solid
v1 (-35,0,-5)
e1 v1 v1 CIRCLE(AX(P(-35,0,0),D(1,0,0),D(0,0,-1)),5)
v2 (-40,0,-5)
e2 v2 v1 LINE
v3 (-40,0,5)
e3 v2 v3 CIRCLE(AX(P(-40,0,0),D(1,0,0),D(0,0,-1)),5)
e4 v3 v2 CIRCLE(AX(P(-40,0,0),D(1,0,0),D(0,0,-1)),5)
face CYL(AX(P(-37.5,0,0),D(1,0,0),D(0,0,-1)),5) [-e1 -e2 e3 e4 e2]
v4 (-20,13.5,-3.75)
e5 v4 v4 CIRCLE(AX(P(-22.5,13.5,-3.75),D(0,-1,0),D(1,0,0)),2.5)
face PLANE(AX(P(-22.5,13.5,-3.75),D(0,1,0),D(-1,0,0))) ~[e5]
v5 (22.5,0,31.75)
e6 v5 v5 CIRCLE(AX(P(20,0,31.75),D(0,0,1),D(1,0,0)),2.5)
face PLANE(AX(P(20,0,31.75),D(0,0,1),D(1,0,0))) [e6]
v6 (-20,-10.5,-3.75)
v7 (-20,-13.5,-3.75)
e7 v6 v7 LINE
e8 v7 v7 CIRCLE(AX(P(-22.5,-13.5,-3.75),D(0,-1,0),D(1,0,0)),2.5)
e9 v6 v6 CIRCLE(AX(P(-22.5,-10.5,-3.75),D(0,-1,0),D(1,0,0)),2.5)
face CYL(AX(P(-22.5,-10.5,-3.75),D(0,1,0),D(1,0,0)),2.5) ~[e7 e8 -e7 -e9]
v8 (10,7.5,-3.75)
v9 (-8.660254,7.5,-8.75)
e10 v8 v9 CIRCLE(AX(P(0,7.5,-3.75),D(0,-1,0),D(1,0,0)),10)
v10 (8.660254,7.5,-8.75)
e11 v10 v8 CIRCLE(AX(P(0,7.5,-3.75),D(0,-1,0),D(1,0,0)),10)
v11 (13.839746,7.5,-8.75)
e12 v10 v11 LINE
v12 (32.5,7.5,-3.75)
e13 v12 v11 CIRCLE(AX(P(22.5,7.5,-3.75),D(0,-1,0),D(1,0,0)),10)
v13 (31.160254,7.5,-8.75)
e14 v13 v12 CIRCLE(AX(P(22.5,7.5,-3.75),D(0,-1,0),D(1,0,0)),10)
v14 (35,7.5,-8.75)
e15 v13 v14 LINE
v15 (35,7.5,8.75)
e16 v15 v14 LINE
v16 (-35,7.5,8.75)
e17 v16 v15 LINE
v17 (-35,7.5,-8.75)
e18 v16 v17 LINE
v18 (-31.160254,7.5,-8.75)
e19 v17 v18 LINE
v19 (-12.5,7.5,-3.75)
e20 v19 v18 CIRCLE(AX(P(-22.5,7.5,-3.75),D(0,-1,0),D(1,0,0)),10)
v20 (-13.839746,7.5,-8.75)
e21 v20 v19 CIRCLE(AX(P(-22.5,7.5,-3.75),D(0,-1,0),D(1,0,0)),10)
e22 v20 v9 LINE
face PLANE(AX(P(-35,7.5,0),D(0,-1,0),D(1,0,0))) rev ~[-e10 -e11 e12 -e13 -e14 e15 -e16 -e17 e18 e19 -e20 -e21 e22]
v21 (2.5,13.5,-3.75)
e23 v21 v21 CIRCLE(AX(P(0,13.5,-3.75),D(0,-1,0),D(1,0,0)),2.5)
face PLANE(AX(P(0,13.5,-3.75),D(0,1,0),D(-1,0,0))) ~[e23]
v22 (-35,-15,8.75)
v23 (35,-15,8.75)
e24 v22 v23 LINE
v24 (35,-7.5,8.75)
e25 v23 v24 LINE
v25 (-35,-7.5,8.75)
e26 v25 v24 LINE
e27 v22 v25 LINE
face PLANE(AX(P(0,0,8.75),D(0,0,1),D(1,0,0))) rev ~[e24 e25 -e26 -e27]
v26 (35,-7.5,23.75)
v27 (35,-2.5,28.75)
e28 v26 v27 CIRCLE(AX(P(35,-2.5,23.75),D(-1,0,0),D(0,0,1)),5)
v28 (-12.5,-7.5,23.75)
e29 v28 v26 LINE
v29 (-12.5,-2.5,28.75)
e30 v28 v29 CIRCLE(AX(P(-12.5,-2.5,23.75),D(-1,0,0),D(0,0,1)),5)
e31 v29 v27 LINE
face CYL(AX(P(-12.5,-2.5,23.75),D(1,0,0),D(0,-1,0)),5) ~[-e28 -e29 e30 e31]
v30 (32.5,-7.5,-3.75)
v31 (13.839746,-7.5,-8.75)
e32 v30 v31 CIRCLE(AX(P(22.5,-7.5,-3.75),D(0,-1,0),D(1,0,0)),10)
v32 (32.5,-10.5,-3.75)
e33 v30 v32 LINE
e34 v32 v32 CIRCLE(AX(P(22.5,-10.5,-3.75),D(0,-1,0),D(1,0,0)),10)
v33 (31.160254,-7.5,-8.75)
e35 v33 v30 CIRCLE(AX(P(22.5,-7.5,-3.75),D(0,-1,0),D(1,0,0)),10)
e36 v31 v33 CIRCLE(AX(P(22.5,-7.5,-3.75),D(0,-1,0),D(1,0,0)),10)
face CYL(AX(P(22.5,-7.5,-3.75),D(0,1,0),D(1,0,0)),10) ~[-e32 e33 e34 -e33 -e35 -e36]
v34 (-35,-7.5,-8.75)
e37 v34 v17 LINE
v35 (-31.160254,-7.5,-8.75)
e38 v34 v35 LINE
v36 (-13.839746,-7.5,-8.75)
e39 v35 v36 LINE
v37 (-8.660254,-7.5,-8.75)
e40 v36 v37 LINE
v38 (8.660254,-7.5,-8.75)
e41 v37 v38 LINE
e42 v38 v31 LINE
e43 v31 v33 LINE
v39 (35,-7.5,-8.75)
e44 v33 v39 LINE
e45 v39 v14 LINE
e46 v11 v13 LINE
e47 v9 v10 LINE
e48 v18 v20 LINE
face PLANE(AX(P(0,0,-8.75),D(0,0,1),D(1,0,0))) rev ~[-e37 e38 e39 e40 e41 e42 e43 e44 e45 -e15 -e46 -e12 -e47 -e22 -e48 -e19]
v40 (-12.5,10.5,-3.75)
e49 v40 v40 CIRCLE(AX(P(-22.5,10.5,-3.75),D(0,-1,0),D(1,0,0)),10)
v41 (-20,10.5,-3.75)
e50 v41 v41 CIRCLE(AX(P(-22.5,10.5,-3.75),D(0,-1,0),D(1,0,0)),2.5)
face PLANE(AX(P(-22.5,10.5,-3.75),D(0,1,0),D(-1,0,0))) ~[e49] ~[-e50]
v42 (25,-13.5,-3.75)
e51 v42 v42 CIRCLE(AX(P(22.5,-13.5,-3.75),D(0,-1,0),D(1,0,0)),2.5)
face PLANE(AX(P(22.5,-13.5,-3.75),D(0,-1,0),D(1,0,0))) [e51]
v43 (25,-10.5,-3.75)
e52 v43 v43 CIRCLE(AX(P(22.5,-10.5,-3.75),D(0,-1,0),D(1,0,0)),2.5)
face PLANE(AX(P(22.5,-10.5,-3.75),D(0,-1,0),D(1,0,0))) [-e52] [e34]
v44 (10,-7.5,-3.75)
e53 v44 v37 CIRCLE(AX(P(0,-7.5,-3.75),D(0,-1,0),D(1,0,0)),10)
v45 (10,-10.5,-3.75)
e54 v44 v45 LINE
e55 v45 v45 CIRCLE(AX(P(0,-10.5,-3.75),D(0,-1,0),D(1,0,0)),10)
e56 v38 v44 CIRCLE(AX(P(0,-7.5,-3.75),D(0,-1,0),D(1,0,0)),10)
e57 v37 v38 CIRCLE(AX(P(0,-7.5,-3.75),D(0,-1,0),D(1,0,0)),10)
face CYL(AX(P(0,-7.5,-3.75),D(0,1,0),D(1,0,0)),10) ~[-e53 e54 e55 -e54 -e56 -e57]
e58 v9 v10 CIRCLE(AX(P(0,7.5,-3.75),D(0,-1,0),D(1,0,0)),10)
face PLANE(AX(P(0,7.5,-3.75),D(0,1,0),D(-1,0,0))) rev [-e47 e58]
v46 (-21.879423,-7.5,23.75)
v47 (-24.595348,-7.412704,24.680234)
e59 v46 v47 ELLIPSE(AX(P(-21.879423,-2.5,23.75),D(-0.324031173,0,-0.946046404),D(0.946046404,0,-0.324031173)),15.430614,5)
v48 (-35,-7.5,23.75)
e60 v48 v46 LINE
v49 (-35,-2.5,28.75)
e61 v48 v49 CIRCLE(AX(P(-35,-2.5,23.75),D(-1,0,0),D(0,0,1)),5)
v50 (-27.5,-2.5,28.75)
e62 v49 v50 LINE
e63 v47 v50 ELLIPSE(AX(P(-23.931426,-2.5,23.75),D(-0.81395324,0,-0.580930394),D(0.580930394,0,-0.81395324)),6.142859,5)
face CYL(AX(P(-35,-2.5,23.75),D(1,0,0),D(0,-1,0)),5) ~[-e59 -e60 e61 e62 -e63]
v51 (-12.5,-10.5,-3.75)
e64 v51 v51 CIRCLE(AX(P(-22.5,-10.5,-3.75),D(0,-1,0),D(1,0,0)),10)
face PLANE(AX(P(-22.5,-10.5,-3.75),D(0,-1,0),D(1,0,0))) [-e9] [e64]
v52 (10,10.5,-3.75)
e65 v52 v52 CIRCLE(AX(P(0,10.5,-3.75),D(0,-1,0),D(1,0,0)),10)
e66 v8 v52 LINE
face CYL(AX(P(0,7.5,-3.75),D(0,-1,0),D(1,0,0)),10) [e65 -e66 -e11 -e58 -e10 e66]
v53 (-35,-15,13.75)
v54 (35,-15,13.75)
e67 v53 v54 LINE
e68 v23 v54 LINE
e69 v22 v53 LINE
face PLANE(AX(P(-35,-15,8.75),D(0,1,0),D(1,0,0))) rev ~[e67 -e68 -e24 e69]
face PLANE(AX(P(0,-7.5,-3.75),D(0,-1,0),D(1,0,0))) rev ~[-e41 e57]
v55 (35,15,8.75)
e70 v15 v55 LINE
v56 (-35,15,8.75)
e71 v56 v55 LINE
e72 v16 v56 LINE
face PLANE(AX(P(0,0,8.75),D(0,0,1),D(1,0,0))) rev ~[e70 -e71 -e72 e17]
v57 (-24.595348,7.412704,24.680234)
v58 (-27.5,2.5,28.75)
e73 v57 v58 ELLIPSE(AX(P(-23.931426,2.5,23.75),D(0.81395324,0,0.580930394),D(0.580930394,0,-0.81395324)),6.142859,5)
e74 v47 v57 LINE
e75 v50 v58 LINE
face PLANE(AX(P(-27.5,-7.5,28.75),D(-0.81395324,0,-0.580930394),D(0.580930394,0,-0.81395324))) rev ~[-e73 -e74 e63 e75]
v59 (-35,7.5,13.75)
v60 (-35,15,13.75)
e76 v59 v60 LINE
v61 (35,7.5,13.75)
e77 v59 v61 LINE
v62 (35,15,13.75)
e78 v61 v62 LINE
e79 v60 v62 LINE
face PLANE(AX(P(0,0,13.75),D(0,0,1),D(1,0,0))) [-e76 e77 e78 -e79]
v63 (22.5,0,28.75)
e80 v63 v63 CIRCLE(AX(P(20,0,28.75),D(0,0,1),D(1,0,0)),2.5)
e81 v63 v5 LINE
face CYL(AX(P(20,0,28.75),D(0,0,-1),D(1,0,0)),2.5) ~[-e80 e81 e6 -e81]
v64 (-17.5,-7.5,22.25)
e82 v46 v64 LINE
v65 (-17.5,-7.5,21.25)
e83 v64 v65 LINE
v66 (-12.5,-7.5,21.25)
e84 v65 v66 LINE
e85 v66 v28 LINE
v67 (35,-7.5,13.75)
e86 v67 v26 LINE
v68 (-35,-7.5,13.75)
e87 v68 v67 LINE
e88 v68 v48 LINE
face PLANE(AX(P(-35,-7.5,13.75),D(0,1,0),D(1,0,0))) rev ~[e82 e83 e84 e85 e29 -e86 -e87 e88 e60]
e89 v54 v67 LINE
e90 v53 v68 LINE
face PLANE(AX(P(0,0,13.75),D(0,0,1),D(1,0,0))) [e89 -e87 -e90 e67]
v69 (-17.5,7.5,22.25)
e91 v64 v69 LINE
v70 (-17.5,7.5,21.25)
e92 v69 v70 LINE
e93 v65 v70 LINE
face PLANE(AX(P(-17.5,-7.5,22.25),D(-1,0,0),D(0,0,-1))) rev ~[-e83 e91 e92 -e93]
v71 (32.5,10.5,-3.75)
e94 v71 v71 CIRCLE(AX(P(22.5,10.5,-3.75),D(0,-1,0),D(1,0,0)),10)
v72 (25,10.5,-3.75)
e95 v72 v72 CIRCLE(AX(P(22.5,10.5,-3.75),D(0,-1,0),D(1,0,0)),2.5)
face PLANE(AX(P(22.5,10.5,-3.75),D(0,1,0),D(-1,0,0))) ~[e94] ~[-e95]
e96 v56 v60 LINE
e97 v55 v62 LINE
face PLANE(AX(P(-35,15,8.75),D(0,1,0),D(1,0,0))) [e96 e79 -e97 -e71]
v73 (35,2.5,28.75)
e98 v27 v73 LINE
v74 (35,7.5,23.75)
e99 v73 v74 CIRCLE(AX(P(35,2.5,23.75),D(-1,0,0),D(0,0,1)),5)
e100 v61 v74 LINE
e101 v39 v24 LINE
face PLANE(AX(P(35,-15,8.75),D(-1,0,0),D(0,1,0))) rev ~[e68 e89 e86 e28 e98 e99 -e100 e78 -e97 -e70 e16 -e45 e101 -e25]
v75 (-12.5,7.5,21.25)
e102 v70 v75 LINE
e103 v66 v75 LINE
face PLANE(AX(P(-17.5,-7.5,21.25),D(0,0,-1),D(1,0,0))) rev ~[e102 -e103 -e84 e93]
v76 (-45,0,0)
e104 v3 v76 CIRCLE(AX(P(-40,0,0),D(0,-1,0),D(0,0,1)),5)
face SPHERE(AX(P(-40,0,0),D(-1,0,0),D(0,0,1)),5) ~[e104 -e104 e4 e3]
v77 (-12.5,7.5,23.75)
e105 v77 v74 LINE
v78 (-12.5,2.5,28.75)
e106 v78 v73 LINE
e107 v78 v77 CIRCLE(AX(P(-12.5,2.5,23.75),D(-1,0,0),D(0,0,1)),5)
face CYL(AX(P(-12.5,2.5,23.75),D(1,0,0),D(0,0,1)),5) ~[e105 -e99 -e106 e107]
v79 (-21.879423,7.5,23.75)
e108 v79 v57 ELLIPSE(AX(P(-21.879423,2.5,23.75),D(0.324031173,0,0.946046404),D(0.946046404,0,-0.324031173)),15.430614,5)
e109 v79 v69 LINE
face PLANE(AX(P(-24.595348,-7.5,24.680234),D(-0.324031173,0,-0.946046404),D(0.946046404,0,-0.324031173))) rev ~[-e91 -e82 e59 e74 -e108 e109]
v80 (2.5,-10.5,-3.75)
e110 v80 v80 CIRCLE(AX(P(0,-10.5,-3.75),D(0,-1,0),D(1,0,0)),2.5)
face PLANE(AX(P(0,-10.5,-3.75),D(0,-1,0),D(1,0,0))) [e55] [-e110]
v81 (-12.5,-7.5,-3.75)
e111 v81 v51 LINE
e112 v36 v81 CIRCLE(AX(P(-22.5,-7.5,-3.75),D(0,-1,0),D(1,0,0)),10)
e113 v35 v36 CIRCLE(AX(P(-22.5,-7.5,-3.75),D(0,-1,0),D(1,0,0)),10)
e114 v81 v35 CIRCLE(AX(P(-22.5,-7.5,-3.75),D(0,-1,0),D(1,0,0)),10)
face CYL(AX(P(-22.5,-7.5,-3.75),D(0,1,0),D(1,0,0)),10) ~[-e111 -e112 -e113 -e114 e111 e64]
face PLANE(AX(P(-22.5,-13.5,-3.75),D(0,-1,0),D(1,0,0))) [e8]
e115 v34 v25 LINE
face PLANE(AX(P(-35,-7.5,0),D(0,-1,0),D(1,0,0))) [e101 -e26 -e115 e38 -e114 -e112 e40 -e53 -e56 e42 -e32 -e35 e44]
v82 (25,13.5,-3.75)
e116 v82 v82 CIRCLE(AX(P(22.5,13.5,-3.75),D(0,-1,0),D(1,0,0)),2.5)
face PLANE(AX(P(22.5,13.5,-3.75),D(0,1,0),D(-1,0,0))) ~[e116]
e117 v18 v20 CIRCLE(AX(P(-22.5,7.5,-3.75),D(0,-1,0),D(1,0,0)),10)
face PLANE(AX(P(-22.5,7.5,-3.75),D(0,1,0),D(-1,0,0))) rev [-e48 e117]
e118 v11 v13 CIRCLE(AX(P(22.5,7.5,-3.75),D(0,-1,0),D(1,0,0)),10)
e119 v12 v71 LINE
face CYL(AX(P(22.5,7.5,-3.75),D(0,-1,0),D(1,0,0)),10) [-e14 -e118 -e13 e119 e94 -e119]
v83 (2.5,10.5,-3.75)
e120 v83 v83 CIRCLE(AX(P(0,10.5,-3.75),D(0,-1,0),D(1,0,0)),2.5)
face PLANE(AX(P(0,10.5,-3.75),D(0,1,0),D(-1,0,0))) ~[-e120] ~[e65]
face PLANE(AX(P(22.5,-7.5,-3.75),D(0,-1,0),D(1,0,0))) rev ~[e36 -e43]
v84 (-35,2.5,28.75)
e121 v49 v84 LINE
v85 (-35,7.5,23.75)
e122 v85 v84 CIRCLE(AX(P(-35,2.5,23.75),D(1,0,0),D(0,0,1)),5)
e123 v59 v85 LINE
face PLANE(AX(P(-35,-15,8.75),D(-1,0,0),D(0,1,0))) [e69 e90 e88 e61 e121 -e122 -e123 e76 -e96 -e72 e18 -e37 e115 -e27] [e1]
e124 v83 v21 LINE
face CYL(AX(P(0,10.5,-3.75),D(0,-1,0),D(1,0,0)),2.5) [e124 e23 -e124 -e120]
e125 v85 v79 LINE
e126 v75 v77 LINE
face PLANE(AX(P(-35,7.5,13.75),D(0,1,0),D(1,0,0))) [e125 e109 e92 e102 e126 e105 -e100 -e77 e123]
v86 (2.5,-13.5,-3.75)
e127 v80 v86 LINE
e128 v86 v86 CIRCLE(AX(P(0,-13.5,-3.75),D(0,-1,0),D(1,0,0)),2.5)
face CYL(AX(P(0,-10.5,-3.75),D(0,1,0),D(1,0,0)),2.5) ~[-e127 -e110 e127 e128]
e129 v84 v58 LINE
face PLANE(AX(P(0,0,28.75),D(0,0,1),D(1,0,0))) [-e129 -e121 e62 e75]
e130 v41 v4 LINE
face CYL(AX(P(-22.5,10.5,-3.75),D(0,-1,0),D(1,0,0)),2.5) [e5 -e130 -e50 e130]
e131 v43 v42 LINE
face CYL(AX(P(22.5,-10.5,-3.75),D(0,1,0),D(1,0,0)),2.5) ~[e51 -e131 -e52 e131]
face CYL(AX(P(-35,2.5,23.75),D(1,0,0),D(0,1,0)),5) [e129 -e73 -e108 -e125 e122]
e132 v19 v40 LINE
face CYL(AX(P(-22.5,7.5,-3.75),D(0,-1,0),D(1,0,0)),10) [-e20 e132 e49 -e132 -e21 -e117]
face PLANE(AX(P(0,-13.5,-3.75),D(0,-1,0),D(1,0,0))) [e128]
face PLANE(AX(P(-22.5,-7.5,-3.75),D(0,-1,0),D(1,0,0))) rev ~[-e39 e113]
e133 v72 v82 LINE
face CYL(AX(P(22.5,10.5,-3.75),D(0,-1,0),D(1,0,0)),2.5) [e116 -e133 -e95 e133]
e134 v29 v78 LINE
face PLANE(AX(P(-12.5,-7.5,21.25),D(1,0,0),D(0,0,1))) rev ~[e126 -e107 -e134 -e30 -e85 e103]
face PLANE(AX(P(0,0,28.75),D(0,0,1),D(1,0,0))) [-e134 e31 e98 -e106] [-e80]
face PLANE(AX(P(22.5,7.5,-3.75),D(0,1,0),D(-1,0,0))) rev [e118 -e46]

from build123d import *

# Parameters (mm, degrees)
F0_W      = 70
F0_H      = 15
F1_DEPTH  = 8.75
F2_W      = 70
F2_H      = 30
F3_DEPTH  = 5
F4_W      = 70
F4_H      = 15
F5_DEPTH  = 15
F6_W      = 5
F6_H      = 5
F8_R      = 10
F9_DEPTH  = 3
F10_R     = 10
F11_DEPTH = 3
F12_R     = 10
F13_DEPTH = 3
F14_R     = 2.5
F15_DEPTH = 3
F16_R     = 2.5
F17_DEPTH = 3
F18_R     = 2.5
F19_DEPTH = 3
F20_R     = 2.5
F21_DEPTH = 3
F23_DEPTH = 15
F24_R     = 5
F25_R     = 5


# Not quite as in the source:
# - a pattern or mirror of a feature is missing from the dataset's text; its kind, count and spacing are read off the source's solid


with BuildPart() as f1:
    # F0 (on Top) → F1 (new body, symmetric)
    with BuildSketch(Plane.XY):
        Rectangle(F0_W, F0_H)
    extrude(amount=F1_DEPTH, both=True)

    # F2 (on face) → F3 (join)
    with BuildSketch(Plane.XY.offset(8.75)):
        Rectangle(F2_W, F2_H)
    extrude(amount=F3_DEPTH)

    # F4 (on face) → F5 (join)
    with BuildSketch(Plane.XY.offset(13.75)):
        Rectangle(F4_W, F4_H)
    extrude(amount=F5_DEPTH)

    # F6 (on Front) → F7 (revolve)
    with BuildSketch(Plane.XZ):
        with Locations((-37.5, -2.5)):
            Rectangle(F6_W, F6_H)
    revolve(axis=Axis((0.3605282434, 0, 0), (1, 0, 0)))

    # F8 (on face) → F9 (join)
    with BuildSketch(Plane.XZ.offset(7.5)):
        with Locations((-22.5, -3.75)):
            Circle(F8_R)
    f9 = extrude(amount=F9_DEPTH)

    # F9_copies: F9 across plane
    add(f9.mirror(Plane.ZX))

    # F10 (on face) → F11 (join)
    with BuildSketch(Plane.XZ.offset(7.5)):
        with Locations((0, -3.75)):
            Circle(F10_R)
    f11 = extrude(amount=F11_DEPTH)

    # F11_copies: F11 across plane
    add(f11.mirror(Plane.ZX))

    # F12 (on face) → F13 (join)
    with BuildSketch(Plane.XZ.offset(7.5)):
        with Locations((22.5, -3.75)):
            Circle(F12_R)
    f13 = extrude(amount=F13_DEPTH)

    # F13_copies: F13 across plane
    add(f13.mirror(Plane.ZX))

    # F14 (on face) → F15 (join)
    with BuildSketch(Plane.XZ.offset(10.5)):
        with Locations((-22.5, -3.75)):
            Circle(F14_R)
    f15 = extrude(amount=F15_DEPTH)

    # F15_copies: F15 across plane
    add(f15.mirror(Plane.ZX))

    # F16 (on face) → F17 (join)
    with BuildSketch(Plane.XZ.offset(10.5)):
        with Locations((0, -3.75)):
            Circle(F16_R)
    f17 = extrude(amount=F17_DEPTH)

    # F17_copies: F17 across plane
    add(f17.mirror(Plane.ZX))

    # F18 (on face) → F19 (join)
    with BuildSketch(Plane.XZ.offset(10.5)):
        with Locations((22.5, -3.75)):
            Circle(F18_R)
    f19 = extrude(amount=F19_DEPTH)

    # F19_copies: F19 across plane
    add(f19.mirror(Plane.ZX))

    # F20 (on face) → F21 (join)
    with BuildSketch(Plane.XY.offset(28.75)):
        with Locations((20, 0)):
            Circle(F20_R)
    extrude(amount=F21_DEPTH)

    # F22 (on face) → F23 (cut, through all)
    with BuildSketch(Plane.XZ.offset(7.5)):
        Polygon((-12.5, 28.75), (-27.5, 28.75), (-24.5953480316, 24.6802337976), (-17.5, 22.25), (-17.5, 21.25), (-12.5, 21.25), align=None)
    extrude(amount=-F23_DEPTH, mode=Mode.SUBTRACT)

    # F24
    f24_edges = [f1.edges().sort_by_distance(p)[0] for p in [
        (11.25, -7.5, 28.75),
        (11.25, 7.5, 28.75),
    ]]
    fillet(f24_edges, radius=F24_R)

    # F25
    f25_edges = [f1.edges().sort_by_distance(p)[0] for p in [
        (-31.25, -7.5, 28.75),
        (-31.25, 7.5, 28.75),
    ]]
    fillet(f25_edges, radius=F25_R)

    # F26 (on Front) → F27 (revolve)
    with BuildSketch(Plane.XZ):
        with BuildLine():
            Line((-40, 0), (-40, 5))
            ThreePointArc((-40, 5), (-43.5355339059, 3.5355339059), (-45, 0))
            Line((-45, 0), (-40, 0))
        make_face()
    revolve(axis=Axis((-36.5614034235, 0, 0), (1, 0, 0)))


solid = f1.part
